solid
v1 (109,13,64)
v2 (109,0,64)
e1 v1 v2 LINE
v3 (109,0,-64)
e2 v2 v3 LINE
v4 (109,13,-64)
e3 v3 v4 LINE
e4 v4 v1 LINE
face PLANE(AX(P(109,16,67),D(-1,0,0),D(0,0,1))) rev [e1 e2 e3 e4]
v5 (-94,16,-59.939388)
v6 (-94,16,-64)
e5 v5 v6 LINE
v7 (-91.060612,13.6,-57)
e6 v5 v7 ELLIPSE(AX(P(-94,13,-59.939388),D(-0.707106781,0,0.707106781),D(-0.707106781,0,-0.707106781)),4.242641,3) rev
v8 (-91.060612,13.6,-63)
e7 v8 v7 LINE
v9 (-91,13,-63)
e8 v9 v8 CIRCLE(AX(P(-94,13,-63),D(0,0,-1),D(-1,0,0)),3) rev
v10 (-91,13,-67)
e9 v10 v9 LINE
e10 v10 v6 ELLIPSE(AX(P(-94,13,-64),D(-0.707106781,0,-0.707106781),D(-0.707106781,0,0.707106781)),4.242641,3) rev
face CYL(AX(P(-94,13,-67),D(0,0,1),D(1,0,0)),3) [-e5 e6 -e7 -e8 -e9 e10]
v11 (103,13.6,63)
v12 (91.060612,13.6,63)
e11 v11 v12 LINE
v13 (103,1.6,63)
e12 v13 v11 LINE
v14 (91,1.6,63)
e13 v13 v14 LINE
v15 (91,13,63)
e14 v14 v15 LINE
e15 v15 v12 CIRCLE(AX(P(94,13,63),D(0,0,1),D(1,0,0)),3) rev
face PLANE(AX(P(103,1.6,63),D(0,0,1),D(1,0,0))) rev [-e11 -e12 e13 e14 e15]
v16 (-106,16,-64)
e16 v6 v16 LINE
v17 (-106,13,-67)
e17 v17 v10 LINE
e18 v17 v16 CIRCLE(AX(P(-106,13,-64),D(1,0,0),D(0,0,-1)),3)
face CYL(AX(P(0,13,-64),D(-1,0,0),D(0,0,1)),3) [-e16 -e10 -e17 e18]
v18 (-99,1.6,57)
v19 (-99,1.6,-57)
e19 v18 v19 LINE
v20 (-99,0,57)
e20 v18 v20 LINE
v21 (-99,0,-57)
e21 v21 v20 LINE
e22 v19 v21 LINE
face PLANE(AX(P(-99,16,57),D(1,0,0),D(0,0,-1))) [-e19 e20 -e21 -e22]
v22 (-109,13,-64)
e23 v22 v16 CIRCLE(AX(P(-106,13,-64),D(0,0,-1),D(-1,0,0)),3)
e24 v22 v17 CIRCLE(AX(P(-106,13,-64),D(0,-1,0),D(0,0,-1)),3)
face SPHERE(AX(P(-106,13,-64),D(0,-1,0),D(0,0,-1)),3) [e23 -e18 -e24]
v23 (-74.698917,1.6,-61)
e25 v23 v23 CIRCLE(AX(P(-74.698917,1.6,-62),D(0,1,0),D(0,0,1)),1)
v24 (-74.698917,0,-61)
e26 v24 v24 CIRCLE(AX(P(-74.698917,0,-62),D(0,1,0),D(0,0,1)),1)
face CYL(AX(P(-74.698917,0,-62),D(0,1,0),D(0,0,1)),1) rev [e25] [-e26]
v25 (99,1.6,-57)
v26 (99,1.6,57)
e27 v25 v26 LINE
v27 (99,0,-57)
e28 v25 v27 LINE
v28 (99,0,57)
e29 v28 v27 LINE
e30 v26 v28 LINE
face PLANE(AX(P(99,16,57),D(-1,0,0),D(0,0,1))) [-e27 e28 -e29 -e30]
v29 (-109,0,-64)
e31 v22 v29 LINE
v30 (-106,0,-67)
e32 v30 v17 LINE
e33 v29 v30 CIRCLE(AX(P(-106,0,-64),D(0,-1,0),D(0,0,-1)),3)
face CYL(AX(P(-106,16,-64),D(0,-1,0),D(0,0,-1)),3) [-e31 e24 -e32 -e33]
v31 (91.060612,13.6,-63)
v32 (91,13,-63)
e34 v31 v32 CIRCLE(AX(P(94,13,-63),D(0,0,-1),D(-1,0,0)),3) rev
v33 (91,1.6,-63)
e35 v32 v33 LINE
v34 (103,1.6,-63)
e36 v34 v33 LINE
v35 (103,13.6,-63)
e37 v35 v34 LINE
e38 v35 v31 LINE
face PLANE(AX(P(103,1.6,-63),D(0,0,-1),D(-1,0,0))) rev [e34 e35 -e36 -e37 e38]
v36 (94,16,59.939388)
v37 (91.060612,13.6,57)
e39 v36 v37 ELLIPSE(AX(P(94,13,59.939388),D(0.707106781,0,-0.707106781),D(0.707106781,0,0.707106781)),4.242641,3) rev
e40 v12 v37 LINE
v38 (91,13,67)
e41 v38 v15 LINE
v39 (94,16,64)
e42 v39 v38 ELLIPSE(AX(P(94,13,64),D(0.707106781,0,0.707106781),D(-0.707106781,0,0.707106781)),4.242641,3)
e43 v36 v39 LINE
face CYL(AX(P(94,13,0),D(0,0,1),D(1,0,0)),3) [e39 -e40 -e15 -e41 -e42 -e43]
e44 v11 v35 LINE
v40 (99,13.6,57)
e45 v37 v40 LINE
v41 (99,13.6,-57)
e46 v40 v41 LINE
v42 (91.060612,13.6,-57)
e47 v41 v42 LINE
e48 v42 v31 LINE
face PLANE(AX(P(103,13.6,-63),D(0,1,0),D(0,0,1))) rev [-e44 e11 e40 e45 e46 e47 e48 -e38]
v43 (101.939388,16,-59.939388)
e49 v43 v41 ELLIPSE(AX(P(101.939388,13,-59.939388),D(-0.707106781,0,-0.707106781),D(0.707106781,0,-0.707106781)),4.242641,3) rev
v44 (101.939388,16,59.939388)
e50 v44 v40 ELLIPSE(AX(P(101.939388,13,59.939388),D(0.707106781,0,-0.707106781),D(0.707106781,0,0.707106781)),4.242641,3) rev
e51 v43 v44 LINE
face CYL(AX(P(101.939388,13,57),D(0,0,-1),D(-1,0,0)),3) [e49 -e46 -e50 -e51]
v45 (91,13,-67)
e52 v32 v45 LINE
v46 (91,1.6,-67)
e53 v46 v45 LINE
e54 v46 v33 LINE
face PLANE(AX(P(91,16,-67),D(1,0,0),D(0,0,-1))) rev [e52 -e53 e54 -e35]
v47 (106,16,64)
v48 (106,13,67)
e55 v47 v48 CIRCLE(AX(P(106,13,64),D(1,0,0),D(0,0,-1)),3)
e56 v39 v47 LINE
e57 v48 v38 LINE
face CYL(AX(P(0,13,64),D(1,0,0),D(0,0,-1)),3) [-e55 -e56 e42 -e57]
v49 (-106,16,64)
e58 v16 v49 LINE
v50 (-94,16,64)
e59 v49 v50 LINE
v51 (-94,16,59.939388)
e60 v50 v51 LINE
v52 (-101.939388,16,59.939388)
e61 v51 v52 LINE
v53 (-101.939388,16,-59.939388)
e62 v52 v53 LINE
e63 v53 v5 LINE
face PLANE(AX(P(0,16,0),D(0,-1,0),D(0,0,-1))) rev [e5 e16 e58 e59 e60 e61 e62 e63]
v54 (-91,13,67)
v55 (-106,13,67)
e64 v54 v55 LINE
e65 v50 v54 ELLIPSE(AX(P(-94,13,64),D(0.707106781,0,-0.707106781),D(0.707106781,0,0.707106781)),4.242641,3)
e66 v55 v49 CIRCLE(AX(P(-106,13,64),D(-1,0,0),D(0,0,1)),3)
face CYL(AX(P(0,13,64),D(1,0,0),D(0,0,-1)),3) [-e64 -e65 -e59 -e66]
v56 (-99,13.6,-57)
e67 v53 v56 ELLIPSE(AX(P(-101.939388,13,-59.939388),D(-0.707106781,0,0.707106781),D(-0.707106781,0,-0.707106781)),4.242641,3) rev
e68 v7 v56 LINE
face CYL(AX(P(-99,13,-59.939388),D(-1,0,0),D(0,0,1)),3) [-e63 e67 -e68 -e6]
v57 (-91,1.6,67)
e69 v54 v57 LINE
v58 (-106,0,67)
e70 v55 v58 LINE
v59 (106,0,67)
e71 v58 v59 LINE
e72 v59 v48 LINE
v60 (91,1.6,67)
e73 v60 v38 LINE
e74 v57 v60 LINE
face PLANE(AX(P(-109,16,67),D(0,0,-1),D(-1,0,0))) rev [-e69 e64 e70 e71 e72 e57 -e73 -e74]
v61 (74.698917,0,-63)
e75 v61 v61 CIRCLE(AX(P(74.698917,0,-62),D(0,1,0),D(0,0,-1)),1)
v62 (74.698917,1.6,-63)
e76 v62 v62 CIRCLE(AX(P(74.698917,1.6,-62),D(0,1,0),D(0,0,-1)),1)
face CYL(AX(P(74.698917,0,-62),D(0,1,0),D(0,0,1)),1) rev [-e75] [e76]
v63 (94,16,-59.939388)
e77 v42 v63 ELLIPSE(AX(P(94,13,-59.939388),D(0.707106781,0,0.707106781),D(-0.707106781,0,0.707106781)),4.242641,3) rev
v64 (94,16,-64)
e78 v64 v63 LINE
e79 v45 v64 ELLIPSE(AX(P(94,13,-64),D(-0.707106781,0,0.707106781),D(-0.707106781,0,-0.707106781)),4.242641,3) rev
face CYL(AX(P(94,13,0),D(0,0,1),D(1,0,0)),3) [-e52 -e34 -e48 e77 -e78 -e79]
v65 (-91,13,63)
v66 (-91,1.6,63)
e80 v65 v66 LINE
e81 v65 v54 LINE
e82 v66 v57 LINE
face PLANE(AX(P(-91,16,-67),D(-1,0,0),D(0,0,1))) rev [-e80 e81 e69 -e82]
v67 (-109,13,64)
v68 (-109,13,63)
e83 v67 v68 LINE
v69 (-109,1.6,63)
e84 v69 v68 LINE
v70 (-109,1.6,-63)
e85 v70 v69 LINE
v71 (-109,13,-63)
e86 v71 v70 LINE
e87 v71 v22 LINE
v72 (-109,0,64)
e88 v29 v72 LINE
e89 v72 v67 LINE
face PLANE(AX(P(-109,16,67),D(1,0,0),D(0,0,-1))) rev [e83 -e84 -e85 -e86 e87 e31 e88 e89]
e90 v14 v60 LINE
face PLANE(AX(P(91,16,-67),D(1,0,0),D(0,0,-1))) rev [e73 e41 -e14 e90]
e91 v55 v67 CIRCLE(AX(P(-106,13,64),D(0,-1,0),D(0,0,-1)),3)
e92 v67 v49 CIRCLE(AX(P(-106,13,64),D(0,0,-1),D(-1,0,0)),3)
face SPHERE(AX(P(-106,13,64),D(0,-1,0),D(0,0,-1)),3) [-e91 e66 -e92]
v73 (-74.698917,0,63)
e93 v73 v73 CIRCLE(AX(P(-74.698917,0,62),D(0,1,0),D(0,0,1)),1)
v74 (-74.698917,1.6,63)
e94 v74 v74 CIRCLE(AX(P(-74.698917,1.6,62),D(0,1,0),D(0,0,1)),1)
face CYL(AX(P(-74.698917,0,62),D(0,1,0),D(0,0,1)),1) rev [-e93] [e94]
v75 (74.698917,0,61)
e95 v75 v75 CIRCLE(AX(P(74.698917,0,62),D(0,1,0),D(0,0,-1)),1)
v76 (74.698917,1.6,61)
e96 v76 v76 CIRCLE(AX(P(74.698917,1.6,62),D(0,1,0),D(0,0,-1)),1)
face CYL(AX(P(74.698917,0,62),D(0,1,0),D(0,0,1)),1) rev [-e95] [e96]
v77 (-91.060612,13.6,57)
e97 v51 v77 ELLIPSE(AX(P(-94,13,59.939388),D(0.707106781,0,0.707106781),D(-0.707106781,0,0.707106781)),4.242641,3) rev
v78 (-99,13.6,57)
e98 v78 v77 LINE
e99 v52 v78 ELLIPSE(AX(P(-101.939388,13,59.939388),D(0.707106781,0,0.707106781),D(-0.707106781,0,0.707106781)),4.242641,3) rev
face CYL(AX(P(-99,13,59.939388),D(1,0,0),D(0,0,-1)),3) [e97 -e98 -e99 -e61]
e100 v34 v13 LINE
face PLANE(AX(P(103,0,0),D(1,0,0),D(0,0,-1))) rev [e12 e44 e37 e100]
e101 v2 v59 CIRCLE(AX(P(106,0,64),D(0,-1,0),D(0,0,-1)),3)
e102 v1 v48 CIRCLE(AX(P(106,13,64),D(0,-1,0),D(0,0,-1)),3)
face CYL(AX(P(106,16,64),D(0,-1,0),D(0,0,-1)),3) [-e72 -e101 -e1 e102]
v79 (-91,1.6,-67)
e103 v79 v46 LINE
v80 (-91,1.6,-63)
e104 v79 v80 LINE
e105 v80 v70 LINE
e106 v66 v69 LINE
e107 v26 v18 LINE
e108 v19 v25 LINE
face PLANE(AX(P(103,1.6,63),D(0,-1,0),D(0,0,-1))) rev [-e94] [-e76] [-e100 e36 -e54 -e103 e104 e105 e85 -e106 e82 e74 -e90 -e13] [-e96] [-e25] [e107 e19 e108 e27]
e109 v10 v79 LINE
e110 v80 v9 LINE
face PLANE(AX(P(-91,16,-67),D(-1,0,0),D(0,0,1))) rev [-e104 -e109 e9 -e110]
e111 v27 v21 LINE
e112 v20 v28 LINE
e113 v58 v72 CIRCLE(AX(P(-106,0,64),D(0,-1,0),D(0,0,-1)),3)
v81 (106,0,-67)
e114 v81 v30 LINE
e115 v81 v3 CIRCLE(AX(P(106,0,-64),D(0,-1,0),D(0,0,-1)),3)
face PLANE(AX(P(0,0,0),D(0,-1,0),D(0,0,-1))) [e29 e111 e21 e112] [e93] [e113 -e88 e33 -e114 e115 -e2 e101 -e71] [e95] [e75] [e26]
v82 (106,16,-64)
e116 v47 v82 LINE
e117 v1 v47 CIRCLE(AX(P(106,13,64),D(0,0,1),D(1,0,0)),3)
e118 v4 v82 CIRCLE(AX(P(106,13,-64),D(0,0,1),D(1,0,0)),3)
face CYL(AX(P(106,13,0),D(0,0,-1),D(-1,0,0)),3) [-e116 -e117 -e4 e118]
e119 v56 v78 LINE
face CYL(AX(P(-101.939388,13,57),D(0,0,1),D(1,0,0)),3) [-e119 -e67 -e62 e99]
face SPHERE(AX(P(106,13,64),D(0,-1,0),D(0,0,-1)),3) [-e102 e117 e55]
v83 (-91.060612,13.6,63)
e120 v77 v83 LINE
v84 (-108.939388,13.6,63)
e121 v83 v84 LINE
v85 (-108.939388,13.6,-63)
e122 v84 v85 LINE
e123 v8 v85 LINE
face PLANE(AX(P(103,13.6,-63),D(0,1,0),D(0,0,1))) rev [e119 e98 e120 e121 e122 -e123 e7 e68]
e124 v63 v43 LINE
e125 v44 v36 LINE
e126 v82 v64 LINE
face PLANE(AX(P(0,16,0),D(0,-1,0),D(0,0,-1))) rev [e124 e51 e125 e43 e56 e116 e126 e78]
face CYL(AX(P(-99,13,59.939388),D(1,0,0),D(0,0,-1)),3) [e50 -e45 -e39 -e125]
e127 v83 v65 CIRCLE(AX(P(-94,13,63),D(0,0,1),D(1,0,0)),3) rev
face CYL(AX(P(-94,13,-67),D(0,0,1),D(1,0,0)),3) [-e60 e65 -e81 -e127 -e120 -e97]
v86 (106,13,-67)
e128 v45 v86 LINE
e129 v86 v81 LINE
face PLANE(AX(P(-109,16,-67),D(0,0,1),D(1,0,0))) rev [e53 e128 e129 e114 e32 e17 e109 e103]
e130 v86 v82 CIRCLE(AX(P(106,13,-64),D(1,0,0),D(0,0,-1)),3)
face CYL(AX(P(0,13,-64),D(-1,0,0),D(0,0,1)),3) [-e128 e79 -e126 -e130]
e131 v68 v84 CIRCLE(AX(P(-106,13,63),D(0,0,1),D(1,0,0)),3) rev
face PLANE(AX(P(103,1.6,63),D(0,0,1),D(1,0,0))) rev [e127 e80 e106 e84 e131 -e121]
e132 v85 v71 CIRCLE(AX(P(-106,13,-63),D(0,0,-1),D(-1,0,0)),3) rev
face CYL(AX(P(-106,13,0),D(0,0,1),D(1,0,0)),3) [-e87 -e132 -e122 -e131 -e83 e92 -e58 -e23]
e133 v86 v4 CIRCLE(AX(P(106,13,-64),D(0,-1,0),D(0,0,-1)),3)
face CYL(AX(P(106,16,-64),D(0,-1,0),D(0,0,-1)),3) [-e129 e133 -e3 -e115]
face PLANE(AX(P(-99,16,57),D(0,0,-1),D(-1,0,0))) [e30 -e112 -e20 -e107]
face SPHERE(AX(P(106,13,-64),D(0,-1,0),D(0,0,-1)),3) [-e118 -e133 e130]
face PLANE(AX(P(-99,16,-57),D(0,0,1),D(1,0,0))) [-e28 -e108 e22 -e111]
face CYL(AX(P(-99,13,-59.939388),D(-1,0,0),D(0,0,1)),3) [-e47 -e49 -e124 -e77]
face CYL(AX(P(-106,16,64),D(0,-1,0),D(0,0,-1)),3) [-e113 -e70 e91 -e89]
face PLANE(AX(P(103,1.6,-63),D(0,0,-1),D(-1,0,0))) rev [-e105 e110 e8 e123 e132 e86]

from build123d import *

# Parameters (mm, degrees)
SKETCH_219_W        = 218
SKETCH_219_H        = 134
SKETCH_219_W_2      = 198
SKETCH_219_H_2      = 114
EXTRUDE_2_DEPTH     = 16
SKETCH_2_W          = 126
SKETCH_2_H          = 12
CUT_EXTRUDE_1_DEPTH = 212
SKETCH_3_W          = 182
SKETCH_3_H          = 14.4
CUT_EXTRUDE_2_DEPTH = 134
SKETCH_4_R          = 1
CUT_EXTRUDE_3_DEPTH = 1.6
FILLET_1_R          = 3
FILLET_2_R          = 3
FILLET_3_R          = 3


with BuildPart() as part:
    # Sketch 219 → Бобышка-Вытянуть2 (new body)
    with BuildSketch(Plane(origin=(0, 0, 0), x_dir=(1, 0, 0), z_dir=(0, 1, 0))):
        Rectangle(SKETCH_219_W, SKETCH_219_H)
        Rectangle(SKETCH_219_W_2, SKETCH_219_H_2, mode=Mode.SUBTRACT)
    extrude(amount=EXTRUDE_2_DEPTH)

    # Эскиз2 → Вырез-Вытянуть1 (cut)
    with BuildSketch(Plane.ZY.offset(109)):
        with Locations((0, 7.6)):
            Rectangle(SKETCH_2_W, SKETCH_2_H)
    extrude(amount=-CUT_EXTRUDE_1_DEPTH, mode=Mode.SUBTRACT)

    # Эскиз3 → Вырез-Вытянуть2 (cut)
    with BuildSketch(Plane.XY.offset(67)):
        with Locations((0, 8.8)):
            Rectangle(SKETCH_3_W, SKETCH_3_H)
    extrude(amount=-CUT_EXTRUDE_2_DEPTH, mode=Mode.SUBTRACT)

    # Эскиз4 → Вырез-Вытянуть3 (cut)
    with BuildSketch(Plane(origin=(0, 1.6, 0), x_dir=(1, 0, 0), z_dir=(0, 1, 0))):
        with Locations(Location((-74.698916604, 62, 0), (0, 0, 270))):
            Circle(SKETCH_4_R)
        with Locations(Location((-74.698916604, -62, 0), (0, 0, 270))):
            Circle(SKETCH_4_R)
        with Locations(Location((74.698916604, -62, 0), (0, 0, 90))):
            Circle(SKETCH_4_R)
        with Locations(Location((74.698916604, 62, 0), (0, 0, 90))):
            Circle(SKETCH_4_R)
    extrude(amount=-CUT_EXTRUDE_3_DEPTH, mode=Mode.SUBTRACT)

    # Скругление1
    fillet_1_edges = [part.edges().sort_by_distance(p)[0] for p in [
        (109, 8, 67),
        (-109, 8, 67),
        (-109, 8, -67),
        (109, 8, -67),
    ]]
    fillet(fillet_1_edges, radius=FILLET_1_R)

    # Скругление2
    # the kernel refuses this fillet: 3 mm, written as the material it takes off along each edge
    with BuildSketch(Plane(origin=(-91, 16, -49.5), x_dir=(-1, 0, 0), z_dir=(0, 0, -1)), Plane(origin=(-91, 16, 74.5), x_dir=(-1, 0, 0), z_dir=(0, 0, -1))) as fillet_2_piece_1:
        with BuildLine():
            CenterArc((FILLET_2_R, -FILLET_2_R), FILLET_2_R, 90, 90)
            Line((0, -FILLET_2_R), (0, 0))
            Line((0, 0), (FILLET_2_R, 0))
        make_face()
    extrude(amount=25, mode=Mode.SUBTRACT)
    with BuildSketch(Plane(origin=(-83.651530772, 16, -57), x_dir=(0, 0, -1), z_dir=(-1, 0, 0)), Plane(origin=(-99, 16, 57), x_dir=(0, 0, 1), z_dir=(1, 0, 0))) as fillet_2_piece_2:
        with BuildLine():
            CenterArc((2.939387691, 3), FILLET_2_R, 191.536959033, 78.463040967)
            Line((0, 2.4), (0, 0))
            Line((0, 0), (2.939387691, 0))
        make_face()
    extrude(amount=15.348469228, mode=Mode.SUBTRACT)
    with BuildSketch(Plane(origin=(-99, 16, -57), x_dir=(-1, 0, 0), z_dir=(0, 0, 1))) as fillet_2_piece_3:
        with BuildLine():
            CenterArc((2.939387691, 3), FILLET_2_R, 191.536959033, 78.463040967)
            Line((0, 2.4), (0, 0))
            Line((0, 0), (2.939387691, 0))
        make_face()
    extrude(amount=114, mode=Mode.SUBTRACT)
    with BuildSketch(Plane(origin=(-106, 16, 67), x_dir=(0, -1, 0), z_dir=(1, 0, 0))) as fillet_2_piece_4:
        with BuildLine():
            CenterArc((FILLET_2_R, FILLET_2_R), FILLET_2_R, 180, 90)
            Line((0, FILLET_2_R), (0, 0))
            Line((0, 0), (FILLET_2_R, 0))
        make_face()
    extrude(amount=22.5, mode=Mode.SUBTRACT)
    with BuildSketch(Plane(origin=(-106, 16, 64), x_dir=(0, 0, 1), z_dir=(1, 0, 0))) as fillet_2_piece_5:
        with BuildLine():
            CenterArc((3 - FILLET_2_R, FILLET_2_R), FILLET_2_R, 270, 90)
            Line((3 - FILLET_2_R, 0), (3, 0))
            Line((3, 0), (3, FILLET_2_R))
        make_face()
    revolve(axis=Axis((-106, 16, 64), (0, -1, 0)), revolution_arc=90, mode=Mode.SUBTRACT)
    with BuildSketch(Plane(origin=(-109, 16, -64), x_dir=(1, 0, 0), z_dir=(0, 0, 1))) as fillet_2_piece_6:
        with BuildLine():
            CenterArc((FILLET_2_R, -FILLET_2_R), FILLET_2_R, 90, 90)
            Line((0, -FILLET_2_R), (0, 0))
            Line((0, 0), (FILLET_2_R, 0))
        make_face()
    extrude(amount=128, mode=Mode.SUBTRACT)
    with BuildSketch(Plane(origin=(-106, 16, -64), x_dir=(-1, 0, 0), z_dir=(0, 0, 1))) as fillet_2_piece_7:
        with BuildLine():
            CenterArc((3 - FILLET_2_R, FILLET_2_R), FILLET_2_R, 270, 90)
            Line((3, FILLET_2_R), (3, 0))
            Line((3, 0), (3 - FILLET_2_R, 0))
        make_face()
    revolve(axis=Axis((-106, 16, -64), (0, -1, 0)), revolution_arc=90, mode=Mode.SUBTRACT)
    with BuildSketch(Plane(origin=(-83.5, 16, -67), x_dir=(0, 0, 1), z_dir=(-1, 0, 0))) as fillet_2_piece_8:
        with BuildLine():
            CenterArc((FILLET_2_R, -FILLET_2_R), FILLET_2_R, 90, 90)
            Line((0, -FILLET_2_R), (0, 0))
            Line((0, 0), (FILLET_2_R, 0))
        make_face()
    extrude(amount=22.5, mode=Mode.SUBTRACT)
    with BuildSketch(Plane(origin=(-91, 16, -57), x_dir=(0, 0, -1), z_dir=(-1, 0, 0))) as fillet_2_piece_9a_section:
        with BuildLine():
            CenterArc((2.939387691, 3), FILLET_2_R, 191.536959033, 78.463040967)
            Line((0, 2.4), (0, 0))
            Line((0, 0), (2.939387691, 0))
        make_face()
    fillet_2_piece_9a = extrude(amount=15.348469228, mode=Mode.PRIVATE)
    fillet_2_piece_9a = split(fillet_2_piece_9a, bisect_by=Plane(origin=(-99, 16, -57), z_dir=(-1, 0, 0)), keep=Keep.TOP, mode=Mode.PRIVATE)
    with BuildSketch(Plane(origin=(-99, 16, -64.348469228), x_dir=(-1, 0, 0), z_dir=(0, 0, 1))) as fillet_2_piece_9b_section:
        with BuildLine():
            CenterArc((2.939387691, 3), FILLET_2_R, 191.536959033, 78.463040967)
            Line((0, 2.4), (0, 0))
            Line((0, 0), (2.939387691, 0))
        make_face()
    fillet_2_piece_9b = extrude(amount=121.348469228, mode=Mode.PRIVATE)
    fillet_2_piece_9b = split(fillet_2_piece_9b, bisect_by=Plane(origin=(-99, 16, -57), z_dir=(0, 0, -1)), keep=Keep.TOP, mode=Mode.PRIVATE)
    fillet_2_piece_9b = split(fillet_2_piece_9b, bisect_by=Plane(origin=(-99, 16, -63), z_dir=(0, 0, 1)), keep=Keep.TOP, mode=Mode.PRIVATE)
    fillet_2_piece_9 = fillet_2_piece_9a & fillet_2_piece_9b
    add(fillet_2_piece_9, mode=Mode.SUBTRACT)
    with BuildSketch(Plane(origin=(-106.348469228, 16, 57), x_dir=(0, 0, 1), z_dir=(1, 0, 0))) as fillet_2_piece_10a_section:
        with BuildLine():
            CenterArc((2.939387691, 3), FILLET_2_R, 191.536959033, 78.463040967)
            Line((0, 2.4), (0, 0))
            Line((0, 0), (2.939387691, 0))
        make_face()
    fillet_2_piece_10a = extrude(amount=15.348469228, mode=Mode.PRIVATE)
    fillet_2_piece_10a = split(fillet_2_piece_10a, bisect_by=Plane(origin=(-99, 16, 57), z_dir=(-1, 0, 0)), keep=Keep.TOP, mode=Mode.PRIVATE)
    with BuildSketch(Plane(origin=(-99, 16, -57), x_dir=(-1, 0, 0), z_dir=(0, 0, 1))) as fillet_2_piece_10b_section:
        with BuildLine():
            CenterArc((2.939387691, 3), FILLET_2_R, 191.536959033, 78.463040967)
            Line((0, 2.4), (0, 0))
            Line((0, 0), (2.939387691, 0))
        make_face()
    fillet_2_piece_10b = extrude(amount=121.348469228, mode=Mode.PRIVATE)
    fillet_2_piece_10b = split(fillet_2_piece_10b, bisect_by=Plane(origin=(-99, 16, 57), z_dir=(0, 0, 1)), keep=Keep.TOP, mode=Mode.PRIVATE)
    fillet_2_piece_10b = split(fillet_2_piece_10b, bisect_by=Plane(origin=(-99, 16, 63), z_dir=(0, 0, -1)), keep=Keep.TOP, mode=Mode.PRIVATE)
    fillet_2_piece_10 = fillet_2_piece_10a & fillet_2_piece_10b
    add(fillet_2_piece_10, mode=Mode.SUBTRACT)

    # Скругление3
    # the kernel refuses this fillet: 3 mm, written as the material it takes off along each edge
    with BuildSketch(Plane(origin=(106, 16, 64), x_dir=(0, 0, 1), z_dir=(-1, 0, 0))) as fillet_3_piece_1:
        with BuildLine():
            CenterArc((3 - FILLET_3_R, -FILLET_3_R), FILLET_3_R, 0, 90)
            Line((3, -FILLET_3_R), (3, 0))
            Line((3, 0), (3 - FILLET_3_R, 0))
        make_face()
    revolve(axis=Axis((106, 16, 64), (0, 1, 0)), revolution_arc=90, mode=Mode.SUBTRACT)
    with BuildSketch(Plane(origin=(83.5, 16, 67), x_dir=(0, -1, 0), z_dir=(1, 0, 0)), Plane(origin=(106, 16, -67), x_dir=(0, -1, 0), z_dir=(-1, 0, 0))) as fillet_3_piece_2:
        with BuildLine():
            CenterArc((FILLET_3_R, FILLET_3_R), FILLET_3_R, 180, 90)
            Line((0, FILLET_3_R), (0, 0))
            Line((0, 0), (FILLET_3_R, 0))
        make_face()
    extrude(amount=22.5, mode=Mode.SUBTRACT)
    with BuildSketch(Plane(origin=(91, 16, 74.5), x_dir=(0, -1, 0), z_dir=(0, 0, -1)), Plane(origin=(91, 16, -49.5), x_dir=(0, -1, 0), z_dir=(0, 0, -1))) as fillet_3_piece_3:
        with BuildLine():
            CenterArc((FILLET_3_R, -FILLET_3_R), FILLET_3_R, 90, 90)
            Line((0, -FILLET_3_R), (0, 0))
            Line((0, 0), (FILLET_3_R, 0))
        make_face()
    extrude(amount=25, mode=Mode.SUBTRACT)
    with BuildSketch(Plane(origin=(83.651530772, 16, 57), x_dir=(0, -1.0, 1.5720758028687117e-12), z_dir=(1, 0, 0)), Plane(origin=(99, 16, -57), x_dir=(0, -1.0, -1.5750363976010446e-12), z_dir=(-1, 0, 0))) as fillet_3_piece_4:
        with BuildLine():
            CenterArc((3, -2.939387691), FILLET_3_R, 101.536959033, 78.463040967)
            Line((0, -2.939387691), (0, 0))
            Line((0, 0), (2.4, 0))
        make_face()
    extrude(amount=15.348469228, mode=Mode.SUBTRACT)
    with BuildSketch(Plane(origin=(99, 16, 57), x_dir=(1.56911520813638e-12, -1.0, 0), z_dir=(0, 0, -1))) as fillet_3_piece_5:
        with BuildLine():
            CenterArc((3, -2.939387691), FILLET_3_R, 101.536959033, 78.463040967)
            Line((0, -2.939387691), (0, 0))
            Line((0, 0), (2.4, 0))
        make_face()
    extrude(amount=114, mode=Mode.SUBTRACT)
    with BuildSketch(Plane(origin=(106, 16, -64), x_dir=(1, 0, 0), z_dir=(0, 0, 1))) as fillet_3_piece_6:
        with BuildLine():
            CenterArc((3 - FILLET_3_R, -FILLET_3_R), FILLET_3_R, 0, 90)
            Line((3 - FILLET_3_R, 0), (3, 0))
            Line((3, 0), (3, -FILLET_3_R))
        make_face()
    revolve(axis=Axis((106, 16, -64), (0, 1, 0)), revolution_arc=90, mode=Mode.SUBTRACT)
    with BuildSketch(Plane(origin=(109, 16, 64), x_dir=(0, -1, 0), z_dir=(0, 0, -1))) as fillet_3_piece_7:
        with BuildLine():
            CenterArc((FILLET_3_R, FILLET_3_R), FILLET_3_R, 180, 90)
            Line((0, FILLET_3_R), (0, 0))
            Line((0, 0), (FILLET_3_R, 0))
        make_face()
    extrude(amount=128, mode=Mode.SUBTRACT)
    with BuildSketch(Plane(origin=(91, 16, 57), x_dir=(0, -1.0, 1.5720758028687117e-12), z_dir=(1, 0, 0))) as fillet_3_piece_8a_section:
        with BuildLine():
            CenterArc((3, -2.939387691), FILLET_3_R, 101.536959033, 78.463040967)
            Line((0, -2.939387691), (0, 0))
            Line((0, 0), (2.4, 0))
        make_face()
    fillet_3_piece_8a = extrude(amount=15.348469228, mode=Mode.PRIVATE)
    fillet_3_piece_8a = split(fillet_3_piece_8a, bisect_by=Plane(origin=(103, 16, 57), z_dir=(-1, 0, 0)), keep=Keep.TOP, mode=Mode.PRIVATE)
    fillet_3_piece_8a = split(fillet_3_piece_8a, bisect_by=Plane(origin=(99, 16, 57), z_dir=(1, 0, 0)), keep=Keep.TOP, mode=Mode.PRIVATE)
    with BuildSketch(Plane(origin=(99, 16, 64.348469228), x_dir=(1.56911520813638e-12, -1.0, 0), z_dir=(0, 0, -1))) as fillet_3_piece_8b_section:
        with BuildLine():
            CenterArc((3, -2.939387691), FILLET_3_R, 101.536959033, 78.463040967)
            Line((0, -2.939387691), (0, 0))
            Line((0, 0), (2.4, 0))
        make_face()
    fillet_3_piece_8b = extrude(amount=121.348469228, mode=Mode.PRIVATE)
    fillet_3_piece_8b = split(fillet_3_piece_8b, bisect_by=Plane(origin=(99, 16, 63), z_dir=(0, 0, -1)), keep=Keep.TOP, mode=Mode.PRIVATE)
    fillet_3_piece_8b = split(fillet_3_piece_8b, bisect_by=Plane(origin=(99, 16, 57), z_dir=(0, 0, 1)), keep=Keep.TOP, mode=Mode.PRIVATE)
    fillet_3_piece_8 = fillet_3_piece_8a & fillet_3_piece_8b
    add(fillet_3_piece_8, mode=Mode.SUBTRACT)
    with BuildSketch(Plane(origin=(99, 16, 57), x_dir=(1.56911520813638e-12, -1.0, 0), z_dir=(0, 0, -1))) as fillet_3_piece_9a_section:
        with BuildLine():
            CenterArc((3, -2.939387691), FILLET_3_R, 101.536959033, 78.463040967)
            Line((0, -2.939387691), (0, 0))
            Line((0, 0), (2.4, 0))
        make_face()
    fillet_3_piece_9a = extrude(amount=121.348469228, mode=Mode.PRIVATE)
    fillet_3_piece_9a = split(fillet_3_piece_9a, bisect_by=Plane(origin=(99, 16, -63), z_dir=(0, 0, 1)), keep=Keep.TOP, mode=Mode.PRIVATE)
    fillet_3_piece_9a = split(fillet_3_piece_9a, bisect_by=Plane(origin=(99, 16, -57), z_dir=(0, 0, -1)), keep=Keep.TOP, mode=Mode.PRIVATE)
    with BuildSketch(Plane(origin=(106.348469228, 16, -57), x_dir=(0, -1.0, -1.5750363976010446e-12), z_dir=(-1, 0, 0))) as fillet_3_piece_9b_section:
        with BuildLine():
            CenterArc((3, -2.939387691), FILLET_3_R, 101.536959033, 78.463040967)
            Line((0, -2.939387691), (0, 0))
            Line((0, 0), (2.4, 0))
        make_face()
    fillet_3_piece_9b = extrude(amount=15.348469228, mode=Mode.PRIVATE)
    fillet_3_piece_9b = split(fillet_3_piece_9b, bisect_by=Plane(origin=(103, 16, -57), z_dir=(-1, 0, 0)), keep=Keep.TOP, mode=Mode.PRIVATE)
    fillet_3_piece_9b = split(fillet_3_piece_9b, bisect_by=Plane(origin=(99, 16, -57), z_dir=(1, 0, 0)), keep=Keep.TOP, mode=Mode.PRIVATE)
    fillet_3_piece_9 = fillet_3_piece_9a & fillet_3_piece_9b
    add(fillet_3_piece_9, mode=Mode.SUBTRACT)


solid = part.part
